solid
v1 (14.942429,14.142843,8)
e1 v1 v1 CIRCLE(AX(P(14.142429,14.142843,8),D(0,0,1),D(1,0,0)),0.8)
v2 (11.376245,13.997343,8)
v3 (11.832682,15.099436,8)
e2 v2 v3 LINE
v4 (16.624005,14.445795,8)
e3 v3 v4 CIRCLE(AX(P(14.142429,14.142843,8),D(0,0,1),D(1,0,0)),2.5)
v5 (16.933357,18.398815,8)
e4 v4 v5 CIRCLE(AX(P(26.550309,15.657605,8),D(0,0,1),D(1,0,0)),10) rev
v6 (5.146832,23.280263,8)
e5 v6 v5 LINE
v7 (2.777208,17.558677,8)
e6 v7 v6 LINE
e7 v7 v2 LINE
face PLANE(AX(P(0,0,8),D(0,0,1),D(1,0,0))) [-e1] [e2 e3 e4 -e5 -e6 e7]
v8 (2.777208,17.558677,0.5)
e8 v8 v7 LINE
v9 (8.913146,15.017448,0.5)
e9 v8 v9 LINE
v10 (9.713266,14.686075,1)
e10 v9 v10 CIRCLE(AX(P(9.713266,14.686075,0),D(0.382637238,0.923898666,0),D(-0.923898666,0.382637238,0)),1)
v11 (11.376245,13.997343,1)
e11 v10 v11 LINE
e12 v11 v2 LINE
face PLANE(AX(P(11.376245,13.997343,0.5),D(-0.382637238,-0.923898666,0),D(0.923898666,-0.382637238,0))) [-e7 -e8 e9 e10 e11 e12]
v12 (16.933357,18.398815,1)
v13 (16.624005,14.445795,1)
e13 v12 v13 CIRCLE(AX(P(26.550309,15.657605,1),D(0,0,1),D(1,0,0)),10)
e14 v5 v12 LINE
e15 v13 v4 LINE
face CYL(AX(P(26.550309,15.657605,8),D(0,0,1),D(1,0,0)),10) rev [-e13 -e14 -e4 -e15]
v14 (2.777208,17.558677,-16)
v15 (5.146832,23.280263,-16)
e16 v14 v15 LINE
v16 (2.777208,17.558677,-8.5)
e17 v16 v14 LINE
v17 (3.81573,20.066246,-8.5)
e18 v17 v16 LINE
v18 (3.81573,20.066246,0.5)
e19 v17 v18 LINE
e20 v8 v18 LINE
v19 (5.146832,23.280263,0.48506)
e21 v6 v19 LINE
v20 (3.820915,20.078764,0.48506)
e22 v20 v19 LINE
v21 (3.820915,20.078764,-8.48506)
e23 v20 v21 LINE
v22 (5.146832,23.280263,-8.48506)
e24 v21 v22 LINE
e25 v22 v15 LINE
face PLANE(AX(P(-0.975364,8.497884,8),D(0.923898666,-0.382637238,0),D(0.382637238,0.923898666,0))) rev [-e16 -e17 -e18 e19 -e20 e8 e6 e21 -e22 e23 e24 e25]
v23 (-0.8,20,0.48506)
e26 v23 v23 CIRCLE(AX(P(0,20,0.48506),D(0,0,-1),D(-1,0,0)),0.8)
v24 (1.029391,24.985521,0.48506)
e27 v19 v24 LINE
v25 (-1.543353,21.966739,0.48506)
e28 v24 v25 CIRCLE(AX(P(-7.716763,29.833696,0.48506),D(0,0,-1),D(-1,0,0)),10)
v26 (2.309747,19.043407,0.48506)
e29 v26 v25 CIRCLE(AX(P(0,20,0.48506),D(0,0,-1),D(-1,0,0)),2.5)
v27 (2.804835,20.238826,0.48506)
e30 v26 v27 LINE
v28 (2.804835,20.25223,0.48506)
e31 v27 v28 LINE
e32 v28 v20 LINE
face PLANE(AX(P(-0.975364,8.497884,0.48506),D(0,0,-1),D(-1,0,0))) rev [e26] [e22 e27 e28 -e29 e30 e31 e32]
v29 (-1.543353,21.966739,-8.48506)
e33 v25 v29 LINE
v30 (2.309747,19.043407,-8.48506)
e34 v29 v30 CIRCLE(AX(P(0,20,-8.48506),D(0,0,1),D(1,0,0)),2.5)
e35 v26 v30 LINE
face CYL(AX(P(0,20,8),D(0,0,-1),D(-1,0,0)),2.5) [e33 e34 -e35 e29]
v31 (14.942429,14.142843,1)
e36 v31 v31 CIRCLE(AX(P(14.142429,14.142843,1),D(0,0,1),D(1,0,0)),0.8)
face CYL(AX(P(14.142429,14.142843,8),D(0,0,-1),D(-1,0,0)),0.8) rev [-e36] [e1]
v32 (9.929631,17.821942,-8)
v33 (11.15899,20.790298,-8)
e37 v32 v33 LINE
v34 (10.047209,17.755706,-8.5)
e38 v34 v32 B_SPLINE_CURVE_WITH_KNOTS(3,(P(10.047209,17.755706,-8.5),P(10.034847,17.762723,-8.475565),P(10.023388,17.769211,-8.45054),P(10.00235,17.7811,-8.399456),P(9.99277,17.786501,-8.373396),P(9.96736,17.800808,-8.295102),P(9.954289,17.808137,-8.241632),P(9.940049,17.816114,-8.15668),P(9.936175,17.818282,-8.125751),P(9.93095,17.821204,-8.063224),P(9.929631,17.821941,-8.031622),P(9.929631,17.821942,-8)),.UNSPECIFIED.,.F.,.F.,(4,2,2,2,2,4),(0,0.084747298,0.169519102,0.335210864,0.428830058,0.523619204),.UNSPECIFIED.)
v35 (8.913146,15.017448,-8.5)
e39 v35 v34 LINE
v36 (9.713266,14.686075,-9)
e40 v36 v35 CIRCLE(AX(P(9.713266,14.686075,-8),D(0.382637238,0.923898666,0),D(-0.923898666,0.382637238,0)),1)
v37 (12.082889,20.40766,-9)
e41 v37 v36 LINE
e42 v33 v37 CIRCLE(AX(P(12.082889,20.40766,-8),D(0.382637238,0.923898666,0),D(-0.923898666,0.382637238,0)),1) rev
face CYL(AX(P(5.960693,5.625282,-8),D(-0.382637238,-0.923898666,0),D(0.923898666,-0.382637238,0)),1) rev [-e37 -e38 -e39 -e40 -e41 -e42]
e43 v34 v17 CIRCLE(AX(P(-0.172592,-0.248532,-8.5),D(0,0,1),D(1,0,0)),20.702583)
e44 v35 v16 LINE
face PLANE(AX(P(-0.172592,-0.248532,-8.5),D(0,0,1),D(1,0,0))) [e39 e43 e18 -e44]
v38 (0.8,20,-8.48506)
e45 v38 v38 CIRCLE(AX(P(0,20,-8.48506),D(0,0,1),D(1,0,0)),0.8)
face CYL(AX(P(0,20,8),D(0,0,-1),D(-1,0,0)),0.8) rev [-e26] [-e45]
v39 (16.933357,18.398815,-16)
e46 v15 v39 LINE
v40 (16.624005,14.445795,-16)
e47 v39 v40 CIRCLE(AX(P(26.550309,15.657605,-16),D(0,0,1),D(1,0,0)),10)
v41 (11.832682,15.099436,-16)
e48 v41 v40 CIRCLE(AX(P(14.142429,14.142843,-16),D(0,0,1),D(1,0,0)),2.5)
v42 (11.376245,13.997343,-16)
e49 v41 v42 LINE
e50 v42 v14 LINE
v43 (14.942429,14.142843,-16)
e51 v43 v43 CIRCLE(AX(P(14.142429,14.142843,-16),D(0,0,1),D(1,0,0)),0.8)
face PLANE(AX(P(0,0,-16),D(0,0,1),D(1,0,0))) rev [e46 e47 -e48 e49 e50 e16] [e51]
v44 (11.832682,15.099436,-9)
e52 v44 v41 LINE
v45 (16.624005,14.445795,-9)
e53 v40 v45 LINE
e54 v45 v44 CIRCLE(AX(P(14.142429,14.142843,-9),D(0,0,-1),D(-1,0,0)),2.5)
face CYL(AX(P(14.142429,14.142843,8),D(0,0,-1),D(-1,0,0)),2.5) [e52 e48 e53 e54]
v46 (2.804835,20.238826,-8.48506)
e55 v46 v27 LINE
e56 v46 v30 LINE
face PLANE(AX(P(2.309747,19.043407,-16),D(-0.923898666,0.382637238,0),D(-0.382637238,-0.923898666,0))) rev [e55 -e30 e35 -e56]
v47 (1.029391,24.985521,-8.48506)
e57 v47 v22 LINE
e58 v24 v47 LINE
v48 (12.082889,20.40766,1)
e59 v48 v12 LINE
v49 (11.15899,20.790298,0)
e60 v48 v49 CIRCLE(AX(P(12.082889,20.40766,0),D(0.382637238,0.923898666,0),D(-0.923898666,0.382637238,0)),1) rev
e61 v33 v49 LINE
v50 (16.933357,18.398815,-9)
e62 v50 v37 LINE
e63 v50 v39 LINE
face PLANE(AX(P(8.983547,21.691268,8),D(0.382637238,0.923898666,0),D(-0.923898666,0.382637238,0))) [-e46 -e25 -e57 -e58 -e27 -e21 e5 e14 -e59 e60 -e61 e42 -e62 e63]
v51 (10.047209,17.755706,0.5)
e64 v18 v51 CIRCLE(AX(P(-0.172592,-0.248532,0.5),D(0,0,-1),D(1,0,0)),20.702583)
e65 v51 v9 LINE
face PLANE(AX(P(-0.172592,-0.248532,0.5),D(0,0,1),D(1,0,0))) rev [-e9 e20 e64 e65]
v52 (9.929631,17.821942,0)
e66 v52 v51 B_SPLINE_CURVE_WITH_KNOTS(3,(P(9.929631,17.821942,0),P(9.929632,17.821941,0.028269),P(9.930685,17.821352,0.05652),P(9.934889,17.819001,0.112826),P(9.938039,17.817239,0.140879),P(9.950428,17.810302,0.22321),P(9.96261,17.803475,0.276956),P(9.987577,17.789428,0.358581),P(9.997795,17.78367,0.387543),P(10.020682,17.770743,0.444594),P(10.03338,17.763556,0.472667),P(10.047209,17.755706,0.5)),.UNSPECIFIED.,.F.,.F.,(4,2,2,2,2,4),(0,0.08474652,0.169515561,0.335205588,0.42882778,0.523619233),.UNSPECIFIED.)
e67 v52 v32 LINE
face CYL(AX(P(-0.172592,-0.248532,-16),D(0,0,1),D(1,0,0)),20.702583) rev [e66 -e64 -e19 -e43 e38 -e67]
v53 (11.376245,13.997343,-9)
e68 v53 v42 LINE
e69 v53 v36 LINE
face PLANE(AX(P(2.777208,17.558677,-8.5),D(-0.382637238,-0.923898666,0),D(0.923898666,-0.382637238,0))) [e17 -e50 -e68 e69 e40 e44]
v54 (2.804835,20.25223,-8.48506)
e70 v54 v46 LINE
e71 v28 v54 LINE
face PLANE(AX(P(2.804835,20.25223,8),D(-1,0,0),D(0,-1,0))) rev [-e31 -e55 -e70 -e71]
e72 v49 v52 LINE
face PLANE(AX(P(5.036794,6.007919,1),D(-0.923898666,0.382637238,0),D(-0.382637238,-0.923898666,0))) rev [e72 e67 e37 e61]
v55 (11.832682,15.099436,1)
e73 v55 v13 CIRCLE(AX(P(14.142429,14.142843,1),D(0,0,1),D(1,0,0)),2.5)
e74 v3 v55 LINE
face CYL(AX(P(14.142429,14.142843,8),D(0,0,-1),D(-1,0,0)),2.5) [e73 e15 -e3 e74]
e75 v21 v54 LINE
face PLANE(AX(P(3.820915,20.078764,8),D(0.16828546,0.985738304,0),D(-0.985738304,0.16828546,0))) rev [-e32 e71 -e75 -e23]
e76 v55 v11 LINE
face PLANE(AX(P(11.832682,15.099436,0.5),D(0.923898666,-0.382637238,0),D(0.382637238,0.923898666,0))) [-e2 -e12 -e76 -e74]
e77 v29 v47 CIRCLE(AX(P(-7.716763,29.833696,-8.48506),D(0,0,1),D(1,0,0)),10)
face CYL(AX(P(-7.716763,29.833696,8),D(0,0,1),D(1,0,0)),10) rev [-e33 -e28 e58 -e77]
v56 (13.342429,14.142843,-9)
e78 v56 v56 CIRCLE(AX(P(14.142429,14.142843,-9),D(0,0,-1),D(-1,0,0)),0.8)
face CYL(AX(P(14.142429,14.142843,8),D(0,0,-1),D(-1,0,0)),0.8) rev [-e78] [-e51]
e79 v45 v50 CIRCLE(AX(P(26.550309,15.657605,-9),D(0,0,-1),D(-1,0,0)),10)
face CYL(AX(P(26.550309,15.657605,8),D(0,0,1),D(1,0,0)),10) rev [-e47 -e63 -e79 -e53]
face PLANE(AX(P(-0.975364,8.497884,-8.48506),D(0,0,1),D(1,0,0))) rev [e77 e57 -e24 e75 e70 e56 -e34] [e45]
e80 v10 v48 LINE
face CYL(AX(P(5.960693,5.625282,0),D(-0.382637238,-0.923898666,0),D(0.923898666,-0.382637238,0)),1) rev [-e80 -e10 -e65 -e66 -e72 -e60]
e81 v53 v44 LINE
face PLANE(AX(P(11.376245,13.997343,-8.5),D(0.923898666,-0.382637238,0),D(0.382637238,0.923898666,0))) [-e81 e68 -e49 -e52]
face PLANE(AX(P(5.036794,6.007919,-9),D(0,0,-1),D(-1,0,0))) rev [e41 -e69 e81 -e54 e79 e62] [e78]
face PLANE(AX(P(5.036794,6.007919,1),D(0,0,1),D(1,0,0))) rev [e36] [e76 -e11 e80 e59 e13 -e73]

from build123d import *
from OCP.BRepAlgoAPI import BRepAlgoAPI_Cut
from OCP.TopTools import TopTools_ListOfShape

# Parameters (mm, degrees)
SALIENTE_EXTRUIR1_DEPTH      = 8
SALIENTE_EXTRUIR1_DEPTH_BACK = 16
CROQUIS1_R                   = 0.8000000000000019
CROQUIS1_R_2                 = 0.8000000000000002
CROQUIS3_W                   = 5.999999999999999
CROQUIS3_H                   = 7.5149398575439825
CORTAR_EXTRUIR1_DEPTH        = 16
CROQUIS4_W                   = 12.500000000000004
CROQUIS4_H                   = 10.000000000000002
CORTAR_EXTRUIR2_DEPTH        = 16
REDONDEO1_R                  = 10
CORTAR_EXTRUIR3_DEPTH        = 39.561831595033986
SALIENTE_EXTRUIR2_START      = -7
SALIENTE_EXTRUIR2_DEPTH      = 7
SALIENTE_EXTRUIR3_START      = -7
SALIENTE_EXTRUIR3_DEPTH      = 7
CORTAR_EXTRUIR4_DEPTH        = 39.561831595033986
SALIENTE_EXTRUIR4_START      = 0.5
SALIENTE_EXTRUIR4_DEPTH      = 0.5
SALIENTE_EXTRUIR5_DEPTH      = 0.5
REDONDEO2_R                  = 1
SALIENTE_EXTRUIR6_DEPTH      = 7.5
SALIENTE_EXTRUIR7_DEPTH      = 7.5
CORTAR_EXTRUIR5_DEPTH        = 6.192871


with BuildPart() as part:
    # Croquis1 → Saliente-Extruir1 (new, two sides: drawn at the far end of the back side and taken through both)
    with BuildSketch(Plane.XY.offset(-SALIENTE_EXTRUIR1_DEPTH_BACK)):
        with BuildLine():
            Line((2.309746663820058, 19.04340690522453), (11.832681853129706, 15.099435825287522))
            ThreePointArc((11.832681853129735, 15.099435825287586), (14.633813116183077, 11.69161014757831), (15.904999780297969, 15.915790146996653))
            Line((15.904999780297969, 15.915790146996654), (16.93335681353175, 18.398814789031395))
            Line((16.93335681353175, 18.398814789031395), (1.029391105834504, 24.985521467228967))
            Line((1.029391105834504, 24.985521467228967), (0, 22.5))
            ThreePointArc((-2.2e-16, 22.5), (-2.078639306967261, 18.611022451034337), (2.3097466638200577, 19.04340690522453))
        make_face()
        with Locations((14.142428516949789, 14.142842730512115)):
            Circle(CROQUIS1_R, mode=Mode.SUBTRACT)
        with Locations((-8e-16, 20)):
            Circle(CROQUIS1_R_2, mode=Mode.SUBTRACT)
    extrude(amount=SALIENTE_EXTRUIR1_DEPTH + SALIENTE_EXTRUIR1_DEPTH_BACK)

    # Croquis3 → Cortar-Extruir1 (cut)
    with BuildSketch(Plane(origin=(8.98354685928157, 21.691268210929703, 0), x_dir=(0.9238986655280315, -0.38263723791016835, 0), z_dir=(0.38263723791016835, 0.9238986655280315, 0))):
        Polygon((-10.15274475820337, -8), (-4.152744758203371, -8), (-4.152744758203371, -0.4850601424560169), (-10.15274475820337, -0.48506014245601775), align=None)
        with Locations((-7.1527447582033705, 12.242530071228009)):
            Rectangle(CROQUIS3_W, CROQUIS3_H)
    extrude(amount=-CORTAR_EXTRUIR1_DEPTH, mode=Mode.SUBTRACT)

    # Croquis4 → Cortar-Extruir2 (cut)
    with BuildSketch(Plane(origin=(8.98354685928157, 21.691268210929703, 0), x_dir=(0.9238986655280315, -0.38263723791016835, 0), z_dir=(0.38263723791016835, 0.9238986655280315, 0))):
        with Locations((8.604634091236255, 4.000000000000001)):
            Rectangle(CROQUIS4_W, CROQUIS4_H)
    extrude(amount=-CORTAR_EXTRUIR2_DEPTH, mode=Mode.SUBTRACT)

    # Redondeo1
    # the kernel refuses this fillet: 10 mm, written as the material it adds along each edge
    with BuildSketch(Plane(origin=(15.90499978029797, 15.915790146996653, 1), x_dir=(0.43937810664982085, -0.898302220523148, 0), z_dir=(0, 0, 1))) as redondeo1_piece_1:
        with BuildLine():
            CenterArc((4.909244259441116, 9.449263834962537), REDONDEO1_R, 228.0261529616087, 22.86990266701423)
            Line((-1.7786689833312208, 2.0147620724265707), (-1.9124272481866686, 1.8660720371758521))
            ThreePointArc((-1.9124272481866686, 1.8660720371758521), (-1.0392674370387214, 0.8750174766821813), (-0.14993294537311094, -0.13236355953110399))
            Line((-0.14993294537311094, -0.13236355953110399), (0.06545659012588191, -0.18898527669924975))
            ThreePointArc((0.06545659012588191, -0.18898527669924975), (0.8182073765735266, -0.06231595874062915), (1.5709581630211649, -0.18898527669925216))
            Line((1.5709581630211649, -0.18898527669925216), (1.636414753147047, 6e-17))
        make_face()
    extrude(amount=7)
    with BuildSketch(Plane(origin=(15.90499978029797, 15.915790146996653, -16), x_dir=(0.43937810664982085, -0.898302220523148, 0), z_dir=(0, 0, 1))) as redondeo1_piece_2:
        with BuildLine():
            CenterArc((4.909244259441116, 9.449263834962537), REDONDEO1_R, 228.0261529616087, 22.86990266701423)
            Line((-1.7786689833312208, 2.0147620724265707), (-1.9124272481866686, 1.8660720371758521))
            ThreePointArc((-1.9124272481866686, 1.8660720371758521), (-1.0392674370387214, 0.8750174766821813), (-0.14993294537311094, -0.13236355953110399))
            Line((-0.14993294537311094, -0.13236355953110399), (0.06545659012588191, -0.18898527669924975))
            ThreePointArc((0.06545659012588191, -0.18898527669924975), (0.8182073765735266, -0.06231595874062915), (1.5709581630211649, -0.18898527669925216))
            Line((1.5709581630211649, -0.18898527669925216), (1.636414753147047, 6e-17))
        make_face()
    extrude(amount=6.999999999999998)
    with BuildSketch(Plane(origin=(-1.1e-16, 22.5, 0.4850601424560175), x_dir=(-0.9451707970750715, -0.3265764295788571, 0), z_dir=(0, 0, -1))) as redondeo1_piece_3:
        with BuildLine():
            CenterArc((4.898646443682852, 9.451707970750716), REDONDEO1_R, 228.06162230808002, 22.877267808488114)
            Line((-1.784663138412825, 2.0130674343443404), (-1.9183293300547388, 1.8642946236162135))
            ThreePointArc((-1.9183293300547388, 1.8642946236162135), (-1.0419879162330352, 0.8738575030467765), (-0.149656347026621, -0.13267621412539496))
            Line((-0.149656347026621, -0.13267621412539496), (0.06531528591577111, -0.18903415941501364))
            ThreePointArc((0.06531528591577111, -0.18903415941501364), (0.8164410739471419, -0.06292699268767933), (1.5675668619785121, -0.1890341594150131))
            Line((1.5675668619785121, -0.1890341594150131), (1.6328821478942839, -5e-17))
        make_face()
    extrude(amount=8.970120284912035)

    # Croquis5 → Cortar-Extruir3 (cut, through all)
    with BuildSketch(Plane.XY.offset(8)):
        with BuildLine():
            Line((2.309746663820078, 19.04340690522458), (2.8048354948987004, 20.238826130100847))
            ThreePointArc((2.8048354948987004, 20.238826130100847), (7.811221113299703, 18.852662916127482), (12.314929423667346, 16.26384911999791))
            Line((12.314929423667346, 16.26384911999791), (11.83268185312971, 15.099435825287534))
            Line((11.83268185312971, 15.099435825287534), (2.309746663820078, 19.04340690522458))
        make_face()
    extrude(amount=-CORTAR_EXTRUIR3_DEPTH, mode=Mode.SUBTRACT)

    # Croquis7 → Saliente-Extruir2 (add)
    with BuildSketch(Plane(origin=(0, 0, -16), x_dir=(-1, 0, 0), z_dir=(0, 0, -1)).offset(SALIENTE_EXTRUIR2_START)):
        with BuildLine():
            Line((-12.314929423667346, 16.26384911999791), (-11.83268185312971, 15.099435825287534))
            Line((-11.83268185312971, 15.099435825287534), (-2.309746663820078, 19.04340690522458))
            Line((-2.309746663820078, 19.04340690522458), (-2.8048354948986987, 20.238826130100847))
            ThreePointArc((-2.8048354948986987, 20.238826130100847), (-7.811221113299688, 18.852662916127446), (-12.314929423667346, 16.26384911999791))
        make_face()
    extrude(amount=SALIENTE_EXTRUIR2_DEPTH)

    # Croquis8 → Saliente-Extruir3 (add)
    with BuildSketch(Plane.XY.offset(8).offset(SALIENTE_EXTRUIR3_START)):
        with BuildLine():
            Line((11.83268185312971, 15.099435825287534), (12.314929423667346, 16.26384911999791))
            ThreePointArc((12.314929423667346, 16.26384911999791), (11.149114957675053, 17.083977118308297), (9.929630744917306, 17.821941587347368))
            ThreePointArc((9.929630744917306, 17.821941587347368), (6.961487524857346, 19.186020427437004), (3.815730334224168, 20.066245940784494))
            ThreePointArc((3.815730334224168, 20.066245940784494), (3.311351692275589, 20.158796440416758), (2.8048354948986964, 20.238826130100843))
            Line((2.8048354948986964, 20.238826130100843), (2.309746663820078, 19.04340690522458))
            Line((2.309746663820078, 19.04340690522458), (11.83268185312971, 15.099435825287534))
        make_face()
    extrude(amount=SALIENTE_EXTRUIR3_DEPTH)

    # Croquis9 → Cortar-Extruir4 (cut, through all)
    with BuildSketch(Plane(origin=(0, 0, -16), x_dir=(-1, 0, 0), z_dir=(0, 0, -1))):
        Polygon((-3.815730334224168, 20.066245940784487), (-3.233645329348107, 18.66076966731441), (-2.309746663820078, 19.04340690522458), (-2.8048354948986987, 20.238826130100847), (-2.8048354948987475, 20.252229554385092), (-3.8209148592802196, 20.078764261810548), align=None)
    extrude(amount=-CORTAR_EXTRUIR4_DEPTH, mode=Mode.SUBTRACT)

    # Croquis10 → Saliente-Extruir4 (add)
    with BuildSketch(Plane.XY.offset(-9.000000000000002).offset(SALIENTE_EXTRUIR4_START)):
        with BuildLine():
            Line((3.233645329348107, 18.66076966731441), (3.8157303342241673, 20.06624594078449))
            ThreePointArc((3.8157303342241673, 20.06624594078449), (6.961487524857336, 19.186020427436976), (9.929630744917306, 17.821941587347368))
            Line((9.929630744917306, 17.821941587347368), (9.24580396443071, 16.170804198329783))
            Line((9.24580396443071, 16.170804198329783), (3.233645329348107, 18.66076966731441))
        make_face()
    extrude(amount=-SALIENTE_EXTRUIR4_DEPTH)

    # Croquis11 → Saliente-Extruir5 (add)
    with BuildSketch(Plane(origin=(0, 0, 1), x_dir=(-1, 0, 0), z_dir=(0, 0, -1))):
        with BuildLine():
            Line((-9.929630744917324, 17.8219415873474), (-9.245803964430717, 16.170804198329783))
            Line((-9.245803964430717, 16.170804198329783), (-3.233645329348109, 18.66076966731441))
            Line((-3.233645329348109, 18.66076966731441), (-3.815730334224181, 20.066245940784526))
            ThreePointArc((-3.815730334224181, 20.066245940784526), (-6.9614875248573655, 19.18602042743705), (-9.929630744917324, 17.8219415873474))
        make_face()
    extrude(amount=SALIENTE_EXTRUIR5_DEPTH)

    # Redondeo2
    redondeo2_edges = [part.edges().sort_by_distance(p)[0] for p in [
        (10.202397059206133, 18.48055086214986, -9.000000000000002),
        (10.202397059206136, 18.48055086214986, 1),
    ]]
    fillet(redondeo2_edges, radius=REDONDEO2_R)

    # Croquis12 → Saliente-Extruir6 (add)
    with BuildSketch(Plane.XY.offset(8)):
        Polygon((11.83268185312971, 15.099435825287534), (11.436504054366878, 14.142842730512099), (11.37624481953794, 13.997343492256391), (2.7772082957563384, 17.558677334283267), (3.233645329348107, 18.66076966731441), align=None)
    extrude(amount=-SALIENTE_EXTRUIR6_DEPTH)

    # Croquis13 → Saliente-Extruir7 (add)
    with BuildSketch(Plane(origin=(0, 0, -16), x_dir=(-1, 0, 0), z_dir=(0, 0, -1))):
        Polygon((-3.233645329348117, 18.660769667314405), (-2.7772082957563384, 17.558677334283267), (-11.37624481953794, 13.997343492256391), (-11.83268185312971, 15.099435825287534), align=None)
    extrude(amount=-SALIENTE_EXTRUIR7_DEPTH)


with BuildPart() as cortar_extruir5_tool:
    # Croquis15 → Cortar-Extruir5 (new body)
    with BuildSketch(Plane(origin=(8.98354685928157, 21.691268210929703, 0), x_dir=(0.9238986655280315, -0.38263723791016835, 0), z_dir=(0.38263723791016835, 0.9238986655280315, 0))):
        with BuildLine():
            Line((8.604634091236257, 9.000000000000002), (8.604634091236257, -1))
            Line((8.604634091236257, -1), (3.3546340912362544, -1))
            ThreePointArc((3.3546340912362544, -1), (2.6475273100497065, -0.7071067811865478), (2.354634091236254, 1.2e-16))
            Line((2.354634091236254, 1.2e-16), (2.354634091236254, 8))
            ThreePointArc((2.354634091236254, 8), (2.6475273100497057, 8.70710678118655), (3.3546340912362544, 9.000000000000002))
            Line((3.3546340912362544, 9.000000000000002), (8.604634091236257, 9.000000000000002))
        make_face()
    extrude(amount=-CORTAR_EXTRUIR5_DEPTH)


with BuildPart() as part_1:
    add(part.part)

    # Cortar-Extruir5: cut by cortar_extruir5_tool, with a tolerance
    cortar_extruir5_stock = TopTools_ListOfShape()
    cortar_extruir5_stock.Append(part_1.part.wrapped)
    cortar_extruir5_tools = TopTools_ListOfShape()
    cortar_extruir5_tools.Append(cortar_extruir5_tool.part.wrapped)
    cortar_extruir5_cut = BRepAlgoAPI_Cut()
    cortar_extruir5_cut.SetArguments(cortar_extruir5_stock)
    cortar_extruir5_cut.SetTools(cortar_extruir5_tools)
    cortar_extruir5_cut.SetFuzzyValue(0.00001)
    cortar_extruir5_cut.Build()
    add(Compound.cast(cortar_extruir5_cut.Shape()).solids(), mode=Mode.REPLACE)


solid = part_1.part
